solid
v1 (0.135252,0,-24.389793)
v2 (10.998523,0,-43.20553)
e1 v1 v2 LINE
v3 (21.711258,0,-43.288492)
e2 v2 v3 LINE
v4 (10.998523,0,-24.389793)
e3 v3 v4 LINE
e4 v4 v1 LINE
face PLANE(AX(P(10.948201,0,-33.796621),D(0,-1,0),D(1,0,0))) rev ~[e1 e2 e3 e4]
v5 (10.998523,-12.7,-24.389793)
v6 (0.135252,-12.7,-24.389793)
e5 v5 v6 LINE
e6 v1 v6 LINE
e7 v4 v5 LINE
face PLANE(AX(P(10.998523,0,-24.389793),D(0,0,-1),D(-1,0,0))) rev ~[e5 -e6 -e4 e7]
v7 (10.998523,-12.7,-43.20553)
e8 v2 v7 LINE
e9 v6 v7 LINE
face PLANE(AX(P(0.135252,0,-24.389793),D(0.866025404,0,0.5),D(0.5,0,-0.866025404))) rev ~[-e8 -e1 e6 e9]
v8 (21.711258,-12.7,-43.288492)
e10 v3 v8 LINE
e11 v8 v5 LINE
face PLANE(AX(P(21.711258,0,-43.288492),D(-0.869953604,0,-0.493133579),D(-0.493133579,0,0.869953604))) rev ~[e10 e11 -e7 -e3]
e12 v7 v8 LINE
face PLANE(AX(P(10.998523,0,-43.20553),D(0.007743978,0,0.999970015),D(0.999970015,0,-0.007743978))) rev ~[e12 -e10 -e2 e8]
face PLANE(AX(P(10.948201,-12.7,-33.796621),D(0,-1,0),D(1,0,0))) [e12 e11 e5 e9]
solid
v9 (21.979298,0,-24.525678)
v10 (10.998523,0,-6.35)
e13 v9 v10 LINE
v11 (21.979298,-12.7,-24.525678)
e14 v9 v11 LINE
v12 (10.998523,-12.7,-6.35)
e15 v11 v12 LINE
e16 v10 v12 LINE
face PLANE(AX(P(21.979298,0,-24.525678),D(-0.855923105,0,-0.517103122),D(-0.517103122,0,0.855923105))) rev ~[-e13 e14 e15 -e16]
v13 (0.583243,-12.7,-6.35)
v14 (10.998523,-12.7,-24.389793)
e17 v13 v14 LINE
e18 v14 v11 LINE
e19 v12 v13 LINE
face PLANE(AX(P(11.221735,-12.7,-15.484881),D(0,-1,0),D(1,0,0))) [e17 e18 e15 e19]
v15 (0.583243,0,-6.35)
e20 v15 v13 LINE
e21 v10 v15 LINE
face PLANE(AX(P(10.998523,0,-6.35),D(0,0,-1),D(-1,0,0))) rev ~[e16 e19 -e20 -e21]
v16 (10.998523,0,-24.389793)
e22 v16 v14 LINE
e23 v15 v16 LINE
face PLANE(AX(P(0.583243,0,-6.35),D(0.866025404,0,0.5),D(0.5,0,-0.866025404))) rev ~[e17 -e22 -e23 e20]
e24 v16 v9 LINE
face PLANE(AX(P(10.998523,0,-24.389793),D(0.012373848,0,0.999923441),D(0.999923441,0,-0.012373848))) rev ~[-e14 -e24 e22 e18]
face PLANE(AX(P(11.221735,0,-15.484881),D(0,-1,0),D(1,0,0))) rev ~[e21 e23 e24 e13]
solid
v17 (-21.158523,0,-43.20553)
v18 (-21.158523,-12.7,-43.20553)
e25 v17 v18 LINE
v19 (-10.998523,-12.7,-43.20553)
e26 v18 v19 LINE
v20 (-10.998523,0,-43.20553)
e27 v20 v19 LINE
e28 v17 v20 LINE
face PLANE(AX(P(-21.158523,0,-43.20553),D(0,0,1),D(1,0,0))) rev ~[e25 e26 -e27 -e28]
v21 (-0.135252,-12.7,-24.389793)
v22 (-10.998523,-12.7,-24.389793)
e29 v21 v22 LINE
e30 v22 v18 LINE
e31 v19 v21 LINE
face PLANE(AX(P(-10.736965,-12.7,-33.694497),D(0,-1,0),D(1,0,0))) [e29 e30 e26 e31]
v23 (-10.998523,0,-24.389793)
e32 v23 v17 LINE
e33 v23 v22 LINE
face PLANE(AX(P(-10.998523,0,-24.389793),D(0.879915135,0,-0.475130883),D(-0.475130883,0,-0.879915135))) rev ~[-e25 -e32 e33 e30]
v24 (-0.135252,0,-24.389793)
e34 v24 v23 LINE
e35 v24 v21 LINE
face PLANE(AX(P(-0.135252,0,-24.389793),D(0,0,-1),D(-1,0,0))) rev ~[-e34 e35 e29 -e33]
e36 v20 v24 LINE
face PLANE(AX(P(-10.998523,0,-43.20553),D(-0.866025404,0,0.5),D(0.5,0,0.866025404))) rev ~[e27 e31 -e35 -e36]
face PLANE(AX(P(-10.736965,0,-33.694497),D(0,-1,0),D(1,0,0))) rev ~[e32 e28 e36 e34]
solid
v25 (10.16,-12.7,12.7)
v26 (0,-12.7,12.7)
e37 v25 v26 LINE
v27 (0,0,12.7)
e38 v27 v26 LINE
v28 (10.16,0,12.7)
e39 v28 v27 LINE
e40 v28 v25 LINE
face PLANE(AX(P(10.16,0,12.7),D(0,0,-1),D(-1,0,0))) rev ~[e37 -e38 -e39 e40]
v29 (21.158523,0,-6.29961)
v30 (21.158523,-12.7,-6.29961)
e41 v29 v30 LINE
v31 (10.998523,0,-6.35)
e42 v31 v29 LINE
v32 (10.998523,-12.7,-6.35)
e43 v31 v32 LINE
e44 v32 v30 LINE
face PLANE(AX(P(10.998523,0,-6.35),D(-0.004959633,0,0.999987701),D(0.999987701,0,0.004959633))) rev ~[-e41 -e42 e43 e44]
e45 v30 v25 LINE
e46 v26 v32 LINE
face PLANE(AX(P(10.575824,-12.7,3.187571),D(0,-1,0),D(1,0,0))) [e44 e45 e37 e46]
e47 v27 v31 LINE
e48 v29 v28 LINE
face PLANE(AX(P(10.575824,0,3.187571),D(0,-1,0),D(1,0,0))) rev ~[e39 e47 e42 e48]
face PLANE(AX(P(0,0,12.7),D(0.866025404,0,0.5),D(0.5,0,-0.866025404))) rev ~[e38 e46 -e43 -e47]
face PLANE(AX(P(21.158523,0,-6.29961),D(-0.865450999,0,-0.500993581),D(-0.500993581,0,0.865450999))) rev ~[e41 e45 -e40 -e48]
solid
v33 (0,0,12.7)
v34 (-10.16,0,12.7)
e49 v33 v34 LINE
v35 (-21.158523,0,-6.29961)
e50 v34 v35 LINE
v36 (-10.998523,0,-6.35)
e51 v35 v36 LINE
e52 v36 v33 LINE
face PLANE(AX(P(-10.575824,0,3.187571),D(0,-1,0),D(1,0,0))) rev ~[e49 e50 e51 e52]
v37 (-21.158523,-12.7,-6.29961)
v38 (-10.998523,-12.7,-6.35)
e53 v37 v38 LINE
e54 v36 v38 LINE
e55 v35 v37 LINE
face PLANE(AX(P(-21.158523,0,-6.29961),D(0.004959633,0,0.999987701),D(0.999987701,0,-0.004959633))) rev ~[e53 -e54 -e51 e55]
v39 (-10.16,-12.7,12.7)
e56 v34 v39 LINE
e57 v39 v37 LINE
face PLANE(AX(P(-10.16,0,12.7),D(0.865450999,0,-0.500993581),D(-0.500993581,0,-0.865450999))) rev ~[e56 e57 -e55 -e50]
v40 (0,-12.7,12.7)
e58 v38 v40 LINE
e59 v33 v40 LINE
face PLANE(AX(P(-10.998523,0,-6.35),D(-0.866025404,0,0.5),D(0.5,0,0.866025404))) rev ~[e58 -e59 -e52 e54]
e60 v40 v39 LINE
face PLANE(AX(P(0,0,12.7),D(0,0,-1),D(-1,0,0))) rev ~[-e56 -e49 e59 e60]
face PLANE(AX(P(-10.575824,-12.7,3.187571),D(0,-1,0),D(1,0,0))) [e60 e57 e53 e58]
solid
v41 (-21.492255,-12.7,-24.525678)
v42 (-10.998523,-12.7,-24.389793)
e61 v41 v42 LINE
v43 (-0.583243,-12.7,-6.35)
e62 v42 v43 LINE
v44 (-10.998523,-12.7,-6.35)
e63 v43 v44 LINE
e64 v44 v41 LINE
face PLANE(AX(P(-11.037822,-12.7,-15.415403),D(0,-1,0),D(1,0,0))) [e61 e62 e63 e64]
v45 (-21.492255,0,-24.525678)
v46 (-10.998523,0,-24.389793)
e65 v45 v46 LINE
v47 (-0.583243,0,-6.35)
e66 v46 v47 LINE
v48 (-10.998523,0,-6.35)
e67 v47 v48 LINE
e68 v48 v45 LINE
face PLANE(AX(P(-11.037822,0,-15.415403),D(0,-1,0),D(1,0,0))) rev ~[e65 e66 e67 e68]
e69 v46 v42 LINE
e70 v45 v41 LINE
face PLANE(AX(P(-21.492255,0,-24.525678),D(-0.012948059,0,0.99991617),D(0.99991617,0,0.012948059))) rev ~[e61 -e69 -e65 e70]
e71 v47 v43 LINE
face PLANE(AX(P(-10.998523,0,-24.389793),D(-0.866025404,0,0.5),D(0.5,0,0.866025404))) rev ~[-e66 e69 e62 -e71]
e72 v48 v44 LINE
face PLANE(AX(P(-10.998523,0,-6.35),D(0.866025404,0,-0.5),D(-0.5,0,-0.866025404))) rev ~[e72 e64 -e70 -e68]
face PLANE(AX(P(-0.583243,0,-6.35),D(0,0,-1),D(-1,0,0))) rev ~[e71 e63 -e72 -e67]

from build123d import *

# Parameters (mm, degrees)
F1_DEPTH = 12.7


# Not quite as in the source:
# - a length typed as a fraction of an inch, garbled in the dataset ("3 / 203.2 mm" for 3/8 in), is restored


with BuildPart() as f1:
    # F0 (on Front) → F1 (new body)
    with BuildSketch(Plane.XZ):
        Polygon((-10.9985226281, -6.35), (0, 12.7), (-10.16, 12.7), (-21.1585226281, -6.2996095111), align=None)
    extrude(amount=F1_DEPTH)


with BuildPart() as f1b:
    # F0 (on Front) → F1, piece 2 (new body)
    with BuildSketch(Plane.XZ):
        Polygon((10.16, 12.7), (0, 12.7), (10.9985226281, -6.35), (21.1585226281, -6.2996095111), align=None)
    extrude(amount=F1_DEPTH)


with BuildPart() as f1c:
    # F0 (on Front) → F1, piece 3 (new body)
    with BuildSketch(Plane.XZ):
        Polygon((-0.5832433259, -6.35), (-10.9985226281, -6.35), (-21.4922550901, -24.5256777853), (-10.9985226281, -24.3897929265), align=None)
    extrude(amount=F1_DEPTH)


with BuildPart() as f1d:
    # F0 (on Front) → F1, piece 4 (new body)
    with BuildSketch(Plane.XZ):
        Polygon((21.9792984426, -24.5256777853), (10.9985226281, -6.35), (0.5832433259, -6.35), (10.9985226281, -24.3897929265), align=None)
    extrude(amount=F1_DEPTH)


with BuildPart() as f1e:
    # F0 (on Front) → F1, piece 5 (new body)
    with BuildSketch(Plane.XZ):
        Polygon((-0.1352517672, -24.3897929265), (-10.9985226281, -24.3897929265), (-21.1585226281, -43.2055299938), (-10.9985226281, -43.2055299938), align=None)
    extrude(amount=F1_DEPTH)


with BuildPart() as f1f:
    # F0 (on Front) → F1, piece 6 (new body)
    with BuildSketch(Plane.XZ):
        Polygon((21.7112582177, -43.2884916663), (10.9985226281, -24.3897929265), (0.1352517672, -24.3897929265), (10.9985226281, -43.2055299938), align=None)
    extrude(amount=F1_DEPTH)


solid = Compound([f1.part, f1b.part, f1c.part, f1d.part, f1e.part, f1f.part])
